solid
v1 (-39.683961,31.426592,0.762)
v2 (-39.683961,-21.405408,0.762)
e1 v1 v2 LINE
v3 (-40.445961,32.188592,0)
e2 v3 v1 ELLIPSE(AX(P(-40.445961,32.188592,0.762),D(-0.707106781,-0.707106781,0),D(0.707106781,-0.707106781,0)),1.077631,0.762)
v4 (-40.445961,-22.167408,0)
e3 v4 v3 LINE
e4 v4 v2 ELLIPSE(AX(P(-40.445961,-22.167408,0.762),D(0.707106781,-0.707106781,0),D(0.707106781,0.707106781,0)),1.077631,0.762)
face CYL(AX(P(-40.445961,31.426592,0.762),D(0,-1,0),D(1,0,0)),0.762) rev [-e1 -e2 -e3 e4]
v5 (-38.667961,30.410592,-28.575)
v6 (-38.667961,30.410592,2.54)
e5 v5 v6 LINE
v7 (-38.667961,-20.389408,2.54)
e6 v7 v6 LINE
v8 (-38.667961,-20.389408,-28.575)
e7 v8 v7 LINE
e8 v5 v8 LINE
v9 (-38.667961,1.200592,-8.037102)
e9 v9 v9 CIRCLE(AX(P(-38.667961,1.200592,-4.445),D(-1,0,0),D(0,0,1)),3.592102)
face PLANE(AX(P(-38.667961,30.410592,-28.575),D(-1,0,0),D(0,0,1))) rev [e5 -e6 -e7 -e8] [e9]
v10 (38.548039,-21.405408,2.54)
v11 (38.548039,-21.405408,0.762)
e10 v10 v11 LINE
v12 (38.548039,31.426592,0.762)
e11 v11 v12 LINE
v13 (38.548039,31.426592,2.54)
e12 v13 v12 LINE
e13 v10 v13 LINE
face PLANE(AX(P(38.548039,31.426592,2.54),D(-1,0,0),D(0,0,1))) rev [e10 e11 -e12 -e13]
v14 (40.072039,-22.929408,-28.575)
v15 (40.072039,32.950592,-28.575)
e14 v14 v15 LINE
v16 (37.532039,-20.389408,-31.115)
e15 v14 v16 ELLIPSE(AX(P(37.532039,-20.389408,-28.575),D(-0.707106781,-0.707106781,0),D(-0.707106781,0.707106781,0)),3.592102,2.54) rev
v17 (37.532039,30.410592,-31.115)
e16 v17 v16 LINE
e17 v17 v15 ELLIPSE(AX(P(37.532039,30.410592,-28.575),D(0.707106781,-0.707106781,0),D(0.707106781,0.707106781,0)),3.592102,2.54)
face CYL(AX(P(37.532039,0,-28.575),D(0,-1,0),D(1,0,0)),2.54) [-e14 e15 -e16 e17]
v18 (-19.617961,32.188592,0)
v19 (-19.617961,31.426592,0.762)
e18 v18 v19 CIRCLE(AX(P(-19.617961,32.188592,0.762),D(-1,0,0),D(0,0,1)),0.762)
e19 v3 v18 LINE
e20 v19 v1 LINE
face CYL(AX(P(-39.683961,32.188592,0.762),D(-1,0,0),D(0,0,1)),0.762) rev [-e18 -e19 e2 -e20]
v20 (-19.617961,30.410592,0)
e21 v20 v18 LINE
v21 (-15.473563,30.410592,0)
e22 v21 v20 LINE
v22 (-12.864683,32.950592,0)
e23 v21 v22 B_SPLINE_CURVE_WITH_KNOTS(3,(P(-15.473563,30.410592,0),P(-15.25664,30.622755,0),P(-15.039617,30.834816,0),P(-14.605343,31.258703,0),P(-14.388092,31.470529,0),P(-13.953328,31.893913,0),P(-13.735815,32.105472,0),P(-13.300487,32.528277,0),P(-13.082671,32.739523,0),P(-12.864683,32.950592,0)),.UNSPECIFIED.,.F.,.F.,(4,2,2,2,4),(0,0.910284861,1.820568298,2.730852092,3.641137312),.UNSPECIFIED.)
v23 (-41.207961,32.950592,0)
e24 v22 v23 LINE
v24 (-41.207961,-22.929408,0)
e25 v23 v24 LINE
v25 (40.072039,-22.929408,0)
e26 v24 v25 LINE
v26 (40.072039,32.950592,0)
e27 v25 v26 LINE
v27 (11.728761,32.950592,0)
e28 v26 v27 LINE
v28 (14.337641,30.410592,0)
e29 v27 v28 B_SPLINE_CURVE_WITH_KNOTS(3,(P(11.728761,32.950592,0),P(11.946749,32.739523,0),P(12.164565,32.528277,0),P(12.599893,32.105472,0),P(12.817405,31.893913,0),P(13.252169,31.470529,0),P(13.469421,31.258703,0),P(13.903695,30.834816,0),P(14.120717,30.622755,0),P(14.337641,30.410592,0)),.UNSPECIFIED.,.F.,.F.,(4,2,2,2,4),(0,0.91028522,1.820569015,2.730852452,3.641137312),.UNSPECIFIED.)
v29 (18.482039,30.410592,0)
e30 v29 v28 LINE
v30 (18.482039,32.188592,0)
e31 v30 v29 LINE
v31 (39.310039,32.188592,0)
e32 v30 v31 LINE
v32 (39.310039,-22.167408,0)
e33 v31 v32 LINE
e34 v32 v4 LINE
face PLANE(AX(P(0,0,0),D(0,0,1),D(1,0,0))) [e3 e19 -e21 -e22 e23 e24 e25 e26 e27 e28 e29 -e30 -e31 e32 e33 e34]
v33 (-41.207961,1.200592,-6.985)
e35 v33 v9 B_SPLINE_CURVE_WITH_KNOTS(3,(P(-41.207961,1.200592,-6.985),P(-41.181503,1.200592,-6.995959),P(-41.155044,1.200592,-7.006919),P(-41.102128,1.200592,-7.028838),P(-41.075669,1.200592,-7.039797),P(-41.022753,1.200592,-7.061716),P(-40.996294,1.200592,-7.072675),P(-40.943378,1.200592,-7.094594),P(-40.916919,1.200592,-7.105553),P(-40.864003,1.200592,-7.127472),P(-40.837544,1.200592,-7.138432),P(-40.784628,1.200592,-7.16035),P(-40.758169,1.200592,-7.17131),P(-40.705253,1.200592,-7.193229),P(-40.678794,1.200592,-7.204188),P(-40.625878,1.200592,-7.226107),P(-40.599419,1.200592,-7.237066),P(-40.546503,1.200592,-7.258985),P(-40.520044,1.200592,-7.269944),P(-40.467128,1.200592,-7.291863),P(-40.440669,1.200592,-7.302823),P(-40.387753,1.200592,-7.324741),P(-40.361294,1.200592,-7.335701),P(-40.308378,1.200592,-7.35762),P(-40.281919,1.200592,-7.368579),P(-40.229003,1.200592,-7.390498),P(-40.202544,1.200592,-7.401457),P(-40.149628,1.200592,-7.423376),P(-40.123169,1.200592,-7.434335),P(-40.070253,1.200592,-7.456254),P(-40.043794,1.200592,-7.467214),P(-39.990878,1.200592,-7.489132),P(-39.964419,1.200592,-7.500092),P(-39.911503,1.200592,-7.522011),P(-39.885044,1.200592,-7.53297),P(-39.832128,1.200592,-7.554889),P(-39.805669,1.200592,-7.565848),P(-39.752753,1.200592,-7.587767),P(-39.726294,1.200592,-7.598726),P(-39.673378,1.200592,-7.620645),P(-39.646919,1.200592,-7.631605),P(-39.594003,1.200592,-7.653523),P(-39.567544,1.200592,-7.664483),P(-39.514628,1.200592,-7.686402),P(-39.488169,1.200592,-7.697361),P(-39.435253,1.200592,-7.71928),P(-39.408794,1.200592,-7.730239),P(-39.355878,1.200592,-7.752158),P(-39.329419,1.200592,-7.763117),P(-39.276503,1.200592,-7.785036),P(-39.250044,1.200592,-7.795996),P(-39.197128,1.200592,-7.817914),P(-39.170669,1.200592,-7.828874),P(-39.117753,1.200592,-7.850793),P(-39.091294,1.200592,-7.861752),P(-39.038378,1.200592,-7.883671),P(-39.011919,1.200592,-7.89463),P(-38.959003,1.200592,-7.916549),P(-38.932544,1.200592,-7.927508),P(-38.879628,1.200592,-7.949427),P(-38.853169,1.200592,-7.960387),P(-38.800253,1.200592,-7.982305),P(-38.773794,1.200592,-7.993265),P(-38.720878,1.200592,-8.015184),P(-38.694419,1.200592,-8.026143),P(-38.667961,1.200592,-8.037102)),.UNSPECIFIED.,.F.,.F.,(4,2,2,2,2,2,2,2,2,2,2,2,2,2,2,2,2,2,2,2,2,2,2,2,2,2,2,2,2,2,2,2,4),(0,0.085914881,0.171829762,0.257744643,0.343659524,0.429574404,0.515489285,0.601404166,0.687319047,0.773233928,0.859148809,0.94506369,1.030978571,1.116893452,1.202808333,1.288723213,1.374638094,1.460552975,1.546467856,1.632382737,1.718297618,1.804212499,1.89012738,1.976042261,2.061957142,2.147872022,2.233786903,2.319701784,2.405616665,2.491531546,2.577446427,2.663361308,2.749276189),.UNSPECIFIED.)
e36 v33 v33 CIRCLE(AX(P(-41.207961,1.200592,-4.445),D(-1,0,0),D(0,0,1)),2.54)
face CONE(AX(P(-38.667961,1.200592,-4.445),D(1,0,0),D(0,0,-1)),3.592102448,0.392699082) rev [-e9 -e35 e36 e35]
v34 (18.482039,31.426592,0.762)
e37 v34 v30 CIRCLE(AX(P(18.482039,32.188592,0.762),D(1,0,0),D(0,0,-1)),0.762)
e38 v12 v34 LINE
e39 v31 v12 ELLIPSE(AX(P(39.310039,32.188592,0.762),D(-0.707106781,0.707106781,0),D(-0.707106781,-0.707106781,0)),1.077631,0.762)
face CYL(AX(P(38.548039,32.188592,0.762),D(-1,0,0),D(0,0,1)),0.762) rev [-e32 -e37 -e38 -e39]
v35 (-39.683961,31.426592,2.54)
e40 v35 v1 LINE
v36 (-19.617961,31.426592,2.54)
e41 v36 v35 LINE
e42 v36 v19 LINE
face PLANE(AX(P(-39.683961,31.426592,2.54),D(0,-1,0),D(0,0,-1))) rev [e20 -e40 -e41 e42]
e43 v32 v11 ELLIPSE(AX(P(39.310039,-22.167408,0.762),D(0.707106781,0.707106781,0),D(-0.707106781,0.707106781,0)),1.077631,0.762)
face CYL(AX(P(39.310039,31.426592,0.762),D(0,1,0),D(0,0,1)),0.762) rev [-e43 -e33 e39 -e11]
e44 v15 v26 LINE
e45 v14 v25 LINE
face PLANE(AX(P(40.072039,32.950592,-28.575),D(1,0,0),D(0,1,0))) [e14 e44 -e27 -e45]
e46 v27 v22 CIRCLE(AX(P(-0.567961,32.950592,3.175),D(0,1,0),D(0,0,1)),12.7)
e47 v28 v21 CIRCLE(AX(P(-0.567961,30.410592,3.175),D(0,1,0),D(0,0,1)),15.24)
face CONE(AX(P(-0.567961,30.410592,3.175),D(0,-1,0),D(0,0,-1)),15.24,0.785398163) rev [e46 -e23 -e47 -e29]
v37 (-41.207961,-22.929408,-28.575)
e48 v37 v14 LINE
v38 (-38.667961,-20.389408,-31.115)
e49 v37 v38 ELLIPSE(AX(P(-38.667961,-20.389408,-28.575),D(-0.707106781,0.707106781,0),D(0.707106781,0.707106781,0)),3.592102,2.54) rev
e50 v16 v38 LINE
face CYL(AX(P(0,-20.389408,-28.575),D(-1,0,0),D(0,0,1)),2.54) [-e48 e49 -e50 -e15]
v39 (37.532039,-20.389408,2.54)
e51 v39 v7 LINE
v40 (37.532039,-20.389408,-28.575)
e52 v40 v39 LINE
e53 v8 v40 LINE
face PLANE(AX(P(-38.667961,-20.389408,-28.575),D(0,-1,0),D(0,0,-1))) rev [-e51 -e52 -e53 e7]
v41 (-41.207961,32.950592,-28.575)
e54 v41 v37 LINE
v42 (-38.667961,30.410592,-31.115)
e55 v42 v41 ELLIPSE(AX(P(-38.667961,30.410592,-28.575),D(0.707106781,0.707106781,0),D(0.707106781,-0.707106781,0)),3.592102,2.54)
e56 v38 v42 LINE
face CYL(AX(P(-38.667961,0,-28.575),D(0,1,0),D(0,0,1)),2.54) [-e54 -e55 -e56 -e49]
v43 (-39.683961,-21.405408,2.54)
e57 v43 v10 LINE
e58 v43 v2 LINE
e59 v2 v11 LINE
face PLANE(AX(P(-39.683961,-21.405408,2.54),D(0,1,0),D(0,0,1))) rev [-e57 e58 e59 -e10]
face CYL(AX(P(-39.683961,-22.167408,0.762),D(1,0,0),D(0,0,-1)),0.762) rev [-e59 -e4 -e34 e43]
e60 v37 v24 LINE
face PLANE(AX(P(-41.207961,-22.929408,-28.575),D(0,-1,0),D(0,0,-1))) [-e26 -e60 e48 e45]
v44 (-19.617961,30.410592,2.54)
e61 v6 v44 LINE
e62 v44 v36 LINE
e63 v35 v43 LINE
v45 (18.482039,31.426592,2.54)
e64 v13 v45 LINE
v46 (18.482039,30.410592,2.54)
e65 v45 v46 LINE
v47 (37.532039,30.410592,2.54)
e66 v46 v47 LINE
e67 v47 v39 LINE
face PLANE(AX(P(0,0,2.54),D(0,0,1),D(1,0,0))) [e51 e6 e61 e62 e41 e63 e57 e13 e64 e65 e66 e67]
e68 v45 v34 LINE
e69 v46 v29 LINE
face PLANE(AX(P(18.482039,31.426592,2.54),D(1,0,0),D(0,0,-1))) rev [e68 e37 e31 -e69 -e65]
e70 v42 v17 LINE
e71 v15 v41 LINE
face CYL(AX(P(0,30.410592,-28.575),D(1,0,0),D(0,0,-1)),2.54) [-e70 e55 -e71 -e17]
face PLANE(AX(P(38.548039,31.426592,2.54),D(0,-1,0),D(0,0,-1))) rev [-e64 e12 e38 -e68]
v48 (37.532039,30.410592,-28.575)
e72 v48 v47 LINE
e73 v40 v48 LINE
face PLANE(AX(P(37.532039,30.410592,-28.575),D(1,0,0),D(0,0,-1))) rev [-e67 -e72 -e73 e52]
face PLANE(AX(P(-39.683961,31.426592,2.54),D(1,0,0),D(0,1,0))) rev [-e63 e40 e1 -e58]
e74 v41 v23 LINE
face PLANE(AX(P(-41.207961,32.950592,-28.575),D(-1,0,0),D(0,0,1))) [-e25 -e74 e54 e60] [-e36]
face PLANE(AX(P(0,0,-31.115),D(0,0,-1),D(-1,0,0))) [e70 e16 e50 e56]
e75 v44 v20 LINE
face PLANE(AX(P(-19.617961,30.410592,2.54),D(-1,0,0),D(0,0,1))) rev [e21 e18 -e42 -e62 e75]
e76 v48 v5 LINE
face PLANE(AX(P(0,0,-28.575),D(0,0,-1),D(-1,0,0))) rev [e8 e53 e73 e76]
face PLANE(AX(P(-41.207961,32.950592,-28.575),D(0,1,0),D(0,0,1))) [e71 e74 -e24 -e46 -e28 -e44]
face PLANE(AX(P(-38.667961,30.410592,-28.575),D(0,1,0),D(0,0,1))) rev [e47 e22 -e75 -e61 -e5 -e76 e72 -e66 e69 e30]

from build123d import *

# Parameters (mm, degrees)
SKETCH2_W           = 81.28
SKETCH2_H           = 55.88
SKETCH2_W_2         = 76.2
SKETCH2_H_2         = 50.8
BOSS_EXTRUDE1_DEPTH = 28.575
SKETCH3_W           = 81.28
SKETCH3_H           = 55.88
BOSS_EXTRUDE2_DEPTH = 2.54
SKETCH6_R           = 2.54
CUT_EXTRUDE2_DEPTH  = 2.54
CHAMFER2_SIZE2      = 1.052102448
CHAMFER2_SIZE       = 2.54
SKETCH7_R           = 12.7
CUT_EXTRUDE5_DEPTH  = 2.54
BOSS_EXTRUDE3_DEPTH = 2.54
CHAMFER3_SIZE       = 2.54
FILLET2_R           = 0.762
FILLET3_R           = 2.54


with BuildPart() as part:
    # Sketch2 → Boss-Extrude1 (new body)
    with BuildSketch(Plane.XY):
        with Locations((-0.567961126, 5.010592309)):
            Rectangle(SKETCH2_W, SKETCH2_H)
        with Locations((-0.567961126, 5.010592309)):
            Rectangle(SKETCH2_W_2, SKETCH2_H_2, mode=Mode.SUBTRACT)
    extrude(amount=-BOSS_EXTRUDE1_DEPTH)

    # Sketch3 → Boss-Extrude2 (add)
    with BuildSketch(Plane(origin=(0, 0, -28.575), x_dir=(-1, 0, 0), z_dir=(0, 0, -1))):
        with Locations((0.567961126, 5.010592309)):
            Rectangle(SKETCH3_W, SKETCH3_H)
    extrude(amount=BOSS_EXTRUDE2_DEPTH)

    # Sketch6 → Cut-Extrude2 (cut)
    with BuildSketch(Plane.ZY.offset(41.207961126)):
        with Locations((-4.445, 1.200592309)):
            Circle(SKETCH6_R)
    extrude(amount=-CUT_EXTRUDE2_DEPTH, mode=Mode.SUBTRACT)

    # Chamfer2
    chamfer2_edges = [part.edges().sort_by_distance(p)[0] for p in [
        (-38.667961126, 1.200592309, -6.985),
    ]]
    chamfer2_side = [part.faces().sort_by_distance(p)[0] for p in [
        (-38.689003175, 1.200592309, -6.985),
    ]]
    chamfer(chamfer2_edges, length=CHAMFER2_SIZE - 0.0001, length2=CHAMFER2_SIZE2 - 0.0001, reference=chamfer2_side[0])  # a hair under: the kernel refuses the full size

    # Sketch7 → Cut-Extrude5 (cut)
    with BuildSketch(Plane(origin=(0, 32.950592309, 0), x_dir=(1, 0, 0), z_dir=(0, 1, 0))):
        with Locations((-0.567961126, -3.175)):
            Circle(SKETCH7_R)
    extrude(amount=-CUT_EXTRUDE5_DEPTH, mode=Mode.SUBTRACT)

    # Sketch8 → Boss-Extrude3 (add)
    with BuildSketch(Plane.XY):
        Polygon((-38.667961126, 30.410592309), (-19.617961126, 30.410592309), (-19.617961126, 31.426592309), (-39.683961126, 31.426592309), (-39.683961126, -21.405407691), (38.548038874, -21.405407691), (38.548038874, 31.426592309), (18.482038874, 31.426592309), (18.482038874, 30.410592309), (37.532038874, 30.410592309), (37.532038874, -20.389407691), (-38.667961126, -20.389407691), align=None)
    extrude(amount=BOSS_EXTRUDE3_DEPTH)

    # Chamfer3
    chamfer3_edges = [part.edges().sort_by_distance(p)[0] for p in [
        (-0.567961126, 30.410592309, -9.525),
    ]]
    chamfer(chamfer3_edges, length=CHAMFER3_SIZE - 0.0001)  # a hair under: the kernel refuses the full size

    # Fillet2
    fillet2_edges = [part.edges().sort_by_distance(p)[0] for p in [
        (-29.650961126, 31.426592309, 0),
        (-39.683961126, 5.010592309, 0),
        (-0.567961126, -21.405407691, 0),
        (38.548038874, 5.010592309, 0),
        (28.515038874, 31.426592309, 0),
    ]]
    fillet(fillet2_edges, radius=FILLET2_R)

    # Fillet3
    fillet3_edges = [part.edges().sort_by_distance(p)[0] for p in [
        (40.072038874, 5.010592309, -31.115),
        (-0.567961126, -22.929407691, -31.115),
        (-41.207961126, 5.010592309, -31.115),
        (-0.567961126, 32.950592309, -31.115),
    ]]
    fillet(fillet3_edges, radius=FILLET3_R)


solid = part.part
